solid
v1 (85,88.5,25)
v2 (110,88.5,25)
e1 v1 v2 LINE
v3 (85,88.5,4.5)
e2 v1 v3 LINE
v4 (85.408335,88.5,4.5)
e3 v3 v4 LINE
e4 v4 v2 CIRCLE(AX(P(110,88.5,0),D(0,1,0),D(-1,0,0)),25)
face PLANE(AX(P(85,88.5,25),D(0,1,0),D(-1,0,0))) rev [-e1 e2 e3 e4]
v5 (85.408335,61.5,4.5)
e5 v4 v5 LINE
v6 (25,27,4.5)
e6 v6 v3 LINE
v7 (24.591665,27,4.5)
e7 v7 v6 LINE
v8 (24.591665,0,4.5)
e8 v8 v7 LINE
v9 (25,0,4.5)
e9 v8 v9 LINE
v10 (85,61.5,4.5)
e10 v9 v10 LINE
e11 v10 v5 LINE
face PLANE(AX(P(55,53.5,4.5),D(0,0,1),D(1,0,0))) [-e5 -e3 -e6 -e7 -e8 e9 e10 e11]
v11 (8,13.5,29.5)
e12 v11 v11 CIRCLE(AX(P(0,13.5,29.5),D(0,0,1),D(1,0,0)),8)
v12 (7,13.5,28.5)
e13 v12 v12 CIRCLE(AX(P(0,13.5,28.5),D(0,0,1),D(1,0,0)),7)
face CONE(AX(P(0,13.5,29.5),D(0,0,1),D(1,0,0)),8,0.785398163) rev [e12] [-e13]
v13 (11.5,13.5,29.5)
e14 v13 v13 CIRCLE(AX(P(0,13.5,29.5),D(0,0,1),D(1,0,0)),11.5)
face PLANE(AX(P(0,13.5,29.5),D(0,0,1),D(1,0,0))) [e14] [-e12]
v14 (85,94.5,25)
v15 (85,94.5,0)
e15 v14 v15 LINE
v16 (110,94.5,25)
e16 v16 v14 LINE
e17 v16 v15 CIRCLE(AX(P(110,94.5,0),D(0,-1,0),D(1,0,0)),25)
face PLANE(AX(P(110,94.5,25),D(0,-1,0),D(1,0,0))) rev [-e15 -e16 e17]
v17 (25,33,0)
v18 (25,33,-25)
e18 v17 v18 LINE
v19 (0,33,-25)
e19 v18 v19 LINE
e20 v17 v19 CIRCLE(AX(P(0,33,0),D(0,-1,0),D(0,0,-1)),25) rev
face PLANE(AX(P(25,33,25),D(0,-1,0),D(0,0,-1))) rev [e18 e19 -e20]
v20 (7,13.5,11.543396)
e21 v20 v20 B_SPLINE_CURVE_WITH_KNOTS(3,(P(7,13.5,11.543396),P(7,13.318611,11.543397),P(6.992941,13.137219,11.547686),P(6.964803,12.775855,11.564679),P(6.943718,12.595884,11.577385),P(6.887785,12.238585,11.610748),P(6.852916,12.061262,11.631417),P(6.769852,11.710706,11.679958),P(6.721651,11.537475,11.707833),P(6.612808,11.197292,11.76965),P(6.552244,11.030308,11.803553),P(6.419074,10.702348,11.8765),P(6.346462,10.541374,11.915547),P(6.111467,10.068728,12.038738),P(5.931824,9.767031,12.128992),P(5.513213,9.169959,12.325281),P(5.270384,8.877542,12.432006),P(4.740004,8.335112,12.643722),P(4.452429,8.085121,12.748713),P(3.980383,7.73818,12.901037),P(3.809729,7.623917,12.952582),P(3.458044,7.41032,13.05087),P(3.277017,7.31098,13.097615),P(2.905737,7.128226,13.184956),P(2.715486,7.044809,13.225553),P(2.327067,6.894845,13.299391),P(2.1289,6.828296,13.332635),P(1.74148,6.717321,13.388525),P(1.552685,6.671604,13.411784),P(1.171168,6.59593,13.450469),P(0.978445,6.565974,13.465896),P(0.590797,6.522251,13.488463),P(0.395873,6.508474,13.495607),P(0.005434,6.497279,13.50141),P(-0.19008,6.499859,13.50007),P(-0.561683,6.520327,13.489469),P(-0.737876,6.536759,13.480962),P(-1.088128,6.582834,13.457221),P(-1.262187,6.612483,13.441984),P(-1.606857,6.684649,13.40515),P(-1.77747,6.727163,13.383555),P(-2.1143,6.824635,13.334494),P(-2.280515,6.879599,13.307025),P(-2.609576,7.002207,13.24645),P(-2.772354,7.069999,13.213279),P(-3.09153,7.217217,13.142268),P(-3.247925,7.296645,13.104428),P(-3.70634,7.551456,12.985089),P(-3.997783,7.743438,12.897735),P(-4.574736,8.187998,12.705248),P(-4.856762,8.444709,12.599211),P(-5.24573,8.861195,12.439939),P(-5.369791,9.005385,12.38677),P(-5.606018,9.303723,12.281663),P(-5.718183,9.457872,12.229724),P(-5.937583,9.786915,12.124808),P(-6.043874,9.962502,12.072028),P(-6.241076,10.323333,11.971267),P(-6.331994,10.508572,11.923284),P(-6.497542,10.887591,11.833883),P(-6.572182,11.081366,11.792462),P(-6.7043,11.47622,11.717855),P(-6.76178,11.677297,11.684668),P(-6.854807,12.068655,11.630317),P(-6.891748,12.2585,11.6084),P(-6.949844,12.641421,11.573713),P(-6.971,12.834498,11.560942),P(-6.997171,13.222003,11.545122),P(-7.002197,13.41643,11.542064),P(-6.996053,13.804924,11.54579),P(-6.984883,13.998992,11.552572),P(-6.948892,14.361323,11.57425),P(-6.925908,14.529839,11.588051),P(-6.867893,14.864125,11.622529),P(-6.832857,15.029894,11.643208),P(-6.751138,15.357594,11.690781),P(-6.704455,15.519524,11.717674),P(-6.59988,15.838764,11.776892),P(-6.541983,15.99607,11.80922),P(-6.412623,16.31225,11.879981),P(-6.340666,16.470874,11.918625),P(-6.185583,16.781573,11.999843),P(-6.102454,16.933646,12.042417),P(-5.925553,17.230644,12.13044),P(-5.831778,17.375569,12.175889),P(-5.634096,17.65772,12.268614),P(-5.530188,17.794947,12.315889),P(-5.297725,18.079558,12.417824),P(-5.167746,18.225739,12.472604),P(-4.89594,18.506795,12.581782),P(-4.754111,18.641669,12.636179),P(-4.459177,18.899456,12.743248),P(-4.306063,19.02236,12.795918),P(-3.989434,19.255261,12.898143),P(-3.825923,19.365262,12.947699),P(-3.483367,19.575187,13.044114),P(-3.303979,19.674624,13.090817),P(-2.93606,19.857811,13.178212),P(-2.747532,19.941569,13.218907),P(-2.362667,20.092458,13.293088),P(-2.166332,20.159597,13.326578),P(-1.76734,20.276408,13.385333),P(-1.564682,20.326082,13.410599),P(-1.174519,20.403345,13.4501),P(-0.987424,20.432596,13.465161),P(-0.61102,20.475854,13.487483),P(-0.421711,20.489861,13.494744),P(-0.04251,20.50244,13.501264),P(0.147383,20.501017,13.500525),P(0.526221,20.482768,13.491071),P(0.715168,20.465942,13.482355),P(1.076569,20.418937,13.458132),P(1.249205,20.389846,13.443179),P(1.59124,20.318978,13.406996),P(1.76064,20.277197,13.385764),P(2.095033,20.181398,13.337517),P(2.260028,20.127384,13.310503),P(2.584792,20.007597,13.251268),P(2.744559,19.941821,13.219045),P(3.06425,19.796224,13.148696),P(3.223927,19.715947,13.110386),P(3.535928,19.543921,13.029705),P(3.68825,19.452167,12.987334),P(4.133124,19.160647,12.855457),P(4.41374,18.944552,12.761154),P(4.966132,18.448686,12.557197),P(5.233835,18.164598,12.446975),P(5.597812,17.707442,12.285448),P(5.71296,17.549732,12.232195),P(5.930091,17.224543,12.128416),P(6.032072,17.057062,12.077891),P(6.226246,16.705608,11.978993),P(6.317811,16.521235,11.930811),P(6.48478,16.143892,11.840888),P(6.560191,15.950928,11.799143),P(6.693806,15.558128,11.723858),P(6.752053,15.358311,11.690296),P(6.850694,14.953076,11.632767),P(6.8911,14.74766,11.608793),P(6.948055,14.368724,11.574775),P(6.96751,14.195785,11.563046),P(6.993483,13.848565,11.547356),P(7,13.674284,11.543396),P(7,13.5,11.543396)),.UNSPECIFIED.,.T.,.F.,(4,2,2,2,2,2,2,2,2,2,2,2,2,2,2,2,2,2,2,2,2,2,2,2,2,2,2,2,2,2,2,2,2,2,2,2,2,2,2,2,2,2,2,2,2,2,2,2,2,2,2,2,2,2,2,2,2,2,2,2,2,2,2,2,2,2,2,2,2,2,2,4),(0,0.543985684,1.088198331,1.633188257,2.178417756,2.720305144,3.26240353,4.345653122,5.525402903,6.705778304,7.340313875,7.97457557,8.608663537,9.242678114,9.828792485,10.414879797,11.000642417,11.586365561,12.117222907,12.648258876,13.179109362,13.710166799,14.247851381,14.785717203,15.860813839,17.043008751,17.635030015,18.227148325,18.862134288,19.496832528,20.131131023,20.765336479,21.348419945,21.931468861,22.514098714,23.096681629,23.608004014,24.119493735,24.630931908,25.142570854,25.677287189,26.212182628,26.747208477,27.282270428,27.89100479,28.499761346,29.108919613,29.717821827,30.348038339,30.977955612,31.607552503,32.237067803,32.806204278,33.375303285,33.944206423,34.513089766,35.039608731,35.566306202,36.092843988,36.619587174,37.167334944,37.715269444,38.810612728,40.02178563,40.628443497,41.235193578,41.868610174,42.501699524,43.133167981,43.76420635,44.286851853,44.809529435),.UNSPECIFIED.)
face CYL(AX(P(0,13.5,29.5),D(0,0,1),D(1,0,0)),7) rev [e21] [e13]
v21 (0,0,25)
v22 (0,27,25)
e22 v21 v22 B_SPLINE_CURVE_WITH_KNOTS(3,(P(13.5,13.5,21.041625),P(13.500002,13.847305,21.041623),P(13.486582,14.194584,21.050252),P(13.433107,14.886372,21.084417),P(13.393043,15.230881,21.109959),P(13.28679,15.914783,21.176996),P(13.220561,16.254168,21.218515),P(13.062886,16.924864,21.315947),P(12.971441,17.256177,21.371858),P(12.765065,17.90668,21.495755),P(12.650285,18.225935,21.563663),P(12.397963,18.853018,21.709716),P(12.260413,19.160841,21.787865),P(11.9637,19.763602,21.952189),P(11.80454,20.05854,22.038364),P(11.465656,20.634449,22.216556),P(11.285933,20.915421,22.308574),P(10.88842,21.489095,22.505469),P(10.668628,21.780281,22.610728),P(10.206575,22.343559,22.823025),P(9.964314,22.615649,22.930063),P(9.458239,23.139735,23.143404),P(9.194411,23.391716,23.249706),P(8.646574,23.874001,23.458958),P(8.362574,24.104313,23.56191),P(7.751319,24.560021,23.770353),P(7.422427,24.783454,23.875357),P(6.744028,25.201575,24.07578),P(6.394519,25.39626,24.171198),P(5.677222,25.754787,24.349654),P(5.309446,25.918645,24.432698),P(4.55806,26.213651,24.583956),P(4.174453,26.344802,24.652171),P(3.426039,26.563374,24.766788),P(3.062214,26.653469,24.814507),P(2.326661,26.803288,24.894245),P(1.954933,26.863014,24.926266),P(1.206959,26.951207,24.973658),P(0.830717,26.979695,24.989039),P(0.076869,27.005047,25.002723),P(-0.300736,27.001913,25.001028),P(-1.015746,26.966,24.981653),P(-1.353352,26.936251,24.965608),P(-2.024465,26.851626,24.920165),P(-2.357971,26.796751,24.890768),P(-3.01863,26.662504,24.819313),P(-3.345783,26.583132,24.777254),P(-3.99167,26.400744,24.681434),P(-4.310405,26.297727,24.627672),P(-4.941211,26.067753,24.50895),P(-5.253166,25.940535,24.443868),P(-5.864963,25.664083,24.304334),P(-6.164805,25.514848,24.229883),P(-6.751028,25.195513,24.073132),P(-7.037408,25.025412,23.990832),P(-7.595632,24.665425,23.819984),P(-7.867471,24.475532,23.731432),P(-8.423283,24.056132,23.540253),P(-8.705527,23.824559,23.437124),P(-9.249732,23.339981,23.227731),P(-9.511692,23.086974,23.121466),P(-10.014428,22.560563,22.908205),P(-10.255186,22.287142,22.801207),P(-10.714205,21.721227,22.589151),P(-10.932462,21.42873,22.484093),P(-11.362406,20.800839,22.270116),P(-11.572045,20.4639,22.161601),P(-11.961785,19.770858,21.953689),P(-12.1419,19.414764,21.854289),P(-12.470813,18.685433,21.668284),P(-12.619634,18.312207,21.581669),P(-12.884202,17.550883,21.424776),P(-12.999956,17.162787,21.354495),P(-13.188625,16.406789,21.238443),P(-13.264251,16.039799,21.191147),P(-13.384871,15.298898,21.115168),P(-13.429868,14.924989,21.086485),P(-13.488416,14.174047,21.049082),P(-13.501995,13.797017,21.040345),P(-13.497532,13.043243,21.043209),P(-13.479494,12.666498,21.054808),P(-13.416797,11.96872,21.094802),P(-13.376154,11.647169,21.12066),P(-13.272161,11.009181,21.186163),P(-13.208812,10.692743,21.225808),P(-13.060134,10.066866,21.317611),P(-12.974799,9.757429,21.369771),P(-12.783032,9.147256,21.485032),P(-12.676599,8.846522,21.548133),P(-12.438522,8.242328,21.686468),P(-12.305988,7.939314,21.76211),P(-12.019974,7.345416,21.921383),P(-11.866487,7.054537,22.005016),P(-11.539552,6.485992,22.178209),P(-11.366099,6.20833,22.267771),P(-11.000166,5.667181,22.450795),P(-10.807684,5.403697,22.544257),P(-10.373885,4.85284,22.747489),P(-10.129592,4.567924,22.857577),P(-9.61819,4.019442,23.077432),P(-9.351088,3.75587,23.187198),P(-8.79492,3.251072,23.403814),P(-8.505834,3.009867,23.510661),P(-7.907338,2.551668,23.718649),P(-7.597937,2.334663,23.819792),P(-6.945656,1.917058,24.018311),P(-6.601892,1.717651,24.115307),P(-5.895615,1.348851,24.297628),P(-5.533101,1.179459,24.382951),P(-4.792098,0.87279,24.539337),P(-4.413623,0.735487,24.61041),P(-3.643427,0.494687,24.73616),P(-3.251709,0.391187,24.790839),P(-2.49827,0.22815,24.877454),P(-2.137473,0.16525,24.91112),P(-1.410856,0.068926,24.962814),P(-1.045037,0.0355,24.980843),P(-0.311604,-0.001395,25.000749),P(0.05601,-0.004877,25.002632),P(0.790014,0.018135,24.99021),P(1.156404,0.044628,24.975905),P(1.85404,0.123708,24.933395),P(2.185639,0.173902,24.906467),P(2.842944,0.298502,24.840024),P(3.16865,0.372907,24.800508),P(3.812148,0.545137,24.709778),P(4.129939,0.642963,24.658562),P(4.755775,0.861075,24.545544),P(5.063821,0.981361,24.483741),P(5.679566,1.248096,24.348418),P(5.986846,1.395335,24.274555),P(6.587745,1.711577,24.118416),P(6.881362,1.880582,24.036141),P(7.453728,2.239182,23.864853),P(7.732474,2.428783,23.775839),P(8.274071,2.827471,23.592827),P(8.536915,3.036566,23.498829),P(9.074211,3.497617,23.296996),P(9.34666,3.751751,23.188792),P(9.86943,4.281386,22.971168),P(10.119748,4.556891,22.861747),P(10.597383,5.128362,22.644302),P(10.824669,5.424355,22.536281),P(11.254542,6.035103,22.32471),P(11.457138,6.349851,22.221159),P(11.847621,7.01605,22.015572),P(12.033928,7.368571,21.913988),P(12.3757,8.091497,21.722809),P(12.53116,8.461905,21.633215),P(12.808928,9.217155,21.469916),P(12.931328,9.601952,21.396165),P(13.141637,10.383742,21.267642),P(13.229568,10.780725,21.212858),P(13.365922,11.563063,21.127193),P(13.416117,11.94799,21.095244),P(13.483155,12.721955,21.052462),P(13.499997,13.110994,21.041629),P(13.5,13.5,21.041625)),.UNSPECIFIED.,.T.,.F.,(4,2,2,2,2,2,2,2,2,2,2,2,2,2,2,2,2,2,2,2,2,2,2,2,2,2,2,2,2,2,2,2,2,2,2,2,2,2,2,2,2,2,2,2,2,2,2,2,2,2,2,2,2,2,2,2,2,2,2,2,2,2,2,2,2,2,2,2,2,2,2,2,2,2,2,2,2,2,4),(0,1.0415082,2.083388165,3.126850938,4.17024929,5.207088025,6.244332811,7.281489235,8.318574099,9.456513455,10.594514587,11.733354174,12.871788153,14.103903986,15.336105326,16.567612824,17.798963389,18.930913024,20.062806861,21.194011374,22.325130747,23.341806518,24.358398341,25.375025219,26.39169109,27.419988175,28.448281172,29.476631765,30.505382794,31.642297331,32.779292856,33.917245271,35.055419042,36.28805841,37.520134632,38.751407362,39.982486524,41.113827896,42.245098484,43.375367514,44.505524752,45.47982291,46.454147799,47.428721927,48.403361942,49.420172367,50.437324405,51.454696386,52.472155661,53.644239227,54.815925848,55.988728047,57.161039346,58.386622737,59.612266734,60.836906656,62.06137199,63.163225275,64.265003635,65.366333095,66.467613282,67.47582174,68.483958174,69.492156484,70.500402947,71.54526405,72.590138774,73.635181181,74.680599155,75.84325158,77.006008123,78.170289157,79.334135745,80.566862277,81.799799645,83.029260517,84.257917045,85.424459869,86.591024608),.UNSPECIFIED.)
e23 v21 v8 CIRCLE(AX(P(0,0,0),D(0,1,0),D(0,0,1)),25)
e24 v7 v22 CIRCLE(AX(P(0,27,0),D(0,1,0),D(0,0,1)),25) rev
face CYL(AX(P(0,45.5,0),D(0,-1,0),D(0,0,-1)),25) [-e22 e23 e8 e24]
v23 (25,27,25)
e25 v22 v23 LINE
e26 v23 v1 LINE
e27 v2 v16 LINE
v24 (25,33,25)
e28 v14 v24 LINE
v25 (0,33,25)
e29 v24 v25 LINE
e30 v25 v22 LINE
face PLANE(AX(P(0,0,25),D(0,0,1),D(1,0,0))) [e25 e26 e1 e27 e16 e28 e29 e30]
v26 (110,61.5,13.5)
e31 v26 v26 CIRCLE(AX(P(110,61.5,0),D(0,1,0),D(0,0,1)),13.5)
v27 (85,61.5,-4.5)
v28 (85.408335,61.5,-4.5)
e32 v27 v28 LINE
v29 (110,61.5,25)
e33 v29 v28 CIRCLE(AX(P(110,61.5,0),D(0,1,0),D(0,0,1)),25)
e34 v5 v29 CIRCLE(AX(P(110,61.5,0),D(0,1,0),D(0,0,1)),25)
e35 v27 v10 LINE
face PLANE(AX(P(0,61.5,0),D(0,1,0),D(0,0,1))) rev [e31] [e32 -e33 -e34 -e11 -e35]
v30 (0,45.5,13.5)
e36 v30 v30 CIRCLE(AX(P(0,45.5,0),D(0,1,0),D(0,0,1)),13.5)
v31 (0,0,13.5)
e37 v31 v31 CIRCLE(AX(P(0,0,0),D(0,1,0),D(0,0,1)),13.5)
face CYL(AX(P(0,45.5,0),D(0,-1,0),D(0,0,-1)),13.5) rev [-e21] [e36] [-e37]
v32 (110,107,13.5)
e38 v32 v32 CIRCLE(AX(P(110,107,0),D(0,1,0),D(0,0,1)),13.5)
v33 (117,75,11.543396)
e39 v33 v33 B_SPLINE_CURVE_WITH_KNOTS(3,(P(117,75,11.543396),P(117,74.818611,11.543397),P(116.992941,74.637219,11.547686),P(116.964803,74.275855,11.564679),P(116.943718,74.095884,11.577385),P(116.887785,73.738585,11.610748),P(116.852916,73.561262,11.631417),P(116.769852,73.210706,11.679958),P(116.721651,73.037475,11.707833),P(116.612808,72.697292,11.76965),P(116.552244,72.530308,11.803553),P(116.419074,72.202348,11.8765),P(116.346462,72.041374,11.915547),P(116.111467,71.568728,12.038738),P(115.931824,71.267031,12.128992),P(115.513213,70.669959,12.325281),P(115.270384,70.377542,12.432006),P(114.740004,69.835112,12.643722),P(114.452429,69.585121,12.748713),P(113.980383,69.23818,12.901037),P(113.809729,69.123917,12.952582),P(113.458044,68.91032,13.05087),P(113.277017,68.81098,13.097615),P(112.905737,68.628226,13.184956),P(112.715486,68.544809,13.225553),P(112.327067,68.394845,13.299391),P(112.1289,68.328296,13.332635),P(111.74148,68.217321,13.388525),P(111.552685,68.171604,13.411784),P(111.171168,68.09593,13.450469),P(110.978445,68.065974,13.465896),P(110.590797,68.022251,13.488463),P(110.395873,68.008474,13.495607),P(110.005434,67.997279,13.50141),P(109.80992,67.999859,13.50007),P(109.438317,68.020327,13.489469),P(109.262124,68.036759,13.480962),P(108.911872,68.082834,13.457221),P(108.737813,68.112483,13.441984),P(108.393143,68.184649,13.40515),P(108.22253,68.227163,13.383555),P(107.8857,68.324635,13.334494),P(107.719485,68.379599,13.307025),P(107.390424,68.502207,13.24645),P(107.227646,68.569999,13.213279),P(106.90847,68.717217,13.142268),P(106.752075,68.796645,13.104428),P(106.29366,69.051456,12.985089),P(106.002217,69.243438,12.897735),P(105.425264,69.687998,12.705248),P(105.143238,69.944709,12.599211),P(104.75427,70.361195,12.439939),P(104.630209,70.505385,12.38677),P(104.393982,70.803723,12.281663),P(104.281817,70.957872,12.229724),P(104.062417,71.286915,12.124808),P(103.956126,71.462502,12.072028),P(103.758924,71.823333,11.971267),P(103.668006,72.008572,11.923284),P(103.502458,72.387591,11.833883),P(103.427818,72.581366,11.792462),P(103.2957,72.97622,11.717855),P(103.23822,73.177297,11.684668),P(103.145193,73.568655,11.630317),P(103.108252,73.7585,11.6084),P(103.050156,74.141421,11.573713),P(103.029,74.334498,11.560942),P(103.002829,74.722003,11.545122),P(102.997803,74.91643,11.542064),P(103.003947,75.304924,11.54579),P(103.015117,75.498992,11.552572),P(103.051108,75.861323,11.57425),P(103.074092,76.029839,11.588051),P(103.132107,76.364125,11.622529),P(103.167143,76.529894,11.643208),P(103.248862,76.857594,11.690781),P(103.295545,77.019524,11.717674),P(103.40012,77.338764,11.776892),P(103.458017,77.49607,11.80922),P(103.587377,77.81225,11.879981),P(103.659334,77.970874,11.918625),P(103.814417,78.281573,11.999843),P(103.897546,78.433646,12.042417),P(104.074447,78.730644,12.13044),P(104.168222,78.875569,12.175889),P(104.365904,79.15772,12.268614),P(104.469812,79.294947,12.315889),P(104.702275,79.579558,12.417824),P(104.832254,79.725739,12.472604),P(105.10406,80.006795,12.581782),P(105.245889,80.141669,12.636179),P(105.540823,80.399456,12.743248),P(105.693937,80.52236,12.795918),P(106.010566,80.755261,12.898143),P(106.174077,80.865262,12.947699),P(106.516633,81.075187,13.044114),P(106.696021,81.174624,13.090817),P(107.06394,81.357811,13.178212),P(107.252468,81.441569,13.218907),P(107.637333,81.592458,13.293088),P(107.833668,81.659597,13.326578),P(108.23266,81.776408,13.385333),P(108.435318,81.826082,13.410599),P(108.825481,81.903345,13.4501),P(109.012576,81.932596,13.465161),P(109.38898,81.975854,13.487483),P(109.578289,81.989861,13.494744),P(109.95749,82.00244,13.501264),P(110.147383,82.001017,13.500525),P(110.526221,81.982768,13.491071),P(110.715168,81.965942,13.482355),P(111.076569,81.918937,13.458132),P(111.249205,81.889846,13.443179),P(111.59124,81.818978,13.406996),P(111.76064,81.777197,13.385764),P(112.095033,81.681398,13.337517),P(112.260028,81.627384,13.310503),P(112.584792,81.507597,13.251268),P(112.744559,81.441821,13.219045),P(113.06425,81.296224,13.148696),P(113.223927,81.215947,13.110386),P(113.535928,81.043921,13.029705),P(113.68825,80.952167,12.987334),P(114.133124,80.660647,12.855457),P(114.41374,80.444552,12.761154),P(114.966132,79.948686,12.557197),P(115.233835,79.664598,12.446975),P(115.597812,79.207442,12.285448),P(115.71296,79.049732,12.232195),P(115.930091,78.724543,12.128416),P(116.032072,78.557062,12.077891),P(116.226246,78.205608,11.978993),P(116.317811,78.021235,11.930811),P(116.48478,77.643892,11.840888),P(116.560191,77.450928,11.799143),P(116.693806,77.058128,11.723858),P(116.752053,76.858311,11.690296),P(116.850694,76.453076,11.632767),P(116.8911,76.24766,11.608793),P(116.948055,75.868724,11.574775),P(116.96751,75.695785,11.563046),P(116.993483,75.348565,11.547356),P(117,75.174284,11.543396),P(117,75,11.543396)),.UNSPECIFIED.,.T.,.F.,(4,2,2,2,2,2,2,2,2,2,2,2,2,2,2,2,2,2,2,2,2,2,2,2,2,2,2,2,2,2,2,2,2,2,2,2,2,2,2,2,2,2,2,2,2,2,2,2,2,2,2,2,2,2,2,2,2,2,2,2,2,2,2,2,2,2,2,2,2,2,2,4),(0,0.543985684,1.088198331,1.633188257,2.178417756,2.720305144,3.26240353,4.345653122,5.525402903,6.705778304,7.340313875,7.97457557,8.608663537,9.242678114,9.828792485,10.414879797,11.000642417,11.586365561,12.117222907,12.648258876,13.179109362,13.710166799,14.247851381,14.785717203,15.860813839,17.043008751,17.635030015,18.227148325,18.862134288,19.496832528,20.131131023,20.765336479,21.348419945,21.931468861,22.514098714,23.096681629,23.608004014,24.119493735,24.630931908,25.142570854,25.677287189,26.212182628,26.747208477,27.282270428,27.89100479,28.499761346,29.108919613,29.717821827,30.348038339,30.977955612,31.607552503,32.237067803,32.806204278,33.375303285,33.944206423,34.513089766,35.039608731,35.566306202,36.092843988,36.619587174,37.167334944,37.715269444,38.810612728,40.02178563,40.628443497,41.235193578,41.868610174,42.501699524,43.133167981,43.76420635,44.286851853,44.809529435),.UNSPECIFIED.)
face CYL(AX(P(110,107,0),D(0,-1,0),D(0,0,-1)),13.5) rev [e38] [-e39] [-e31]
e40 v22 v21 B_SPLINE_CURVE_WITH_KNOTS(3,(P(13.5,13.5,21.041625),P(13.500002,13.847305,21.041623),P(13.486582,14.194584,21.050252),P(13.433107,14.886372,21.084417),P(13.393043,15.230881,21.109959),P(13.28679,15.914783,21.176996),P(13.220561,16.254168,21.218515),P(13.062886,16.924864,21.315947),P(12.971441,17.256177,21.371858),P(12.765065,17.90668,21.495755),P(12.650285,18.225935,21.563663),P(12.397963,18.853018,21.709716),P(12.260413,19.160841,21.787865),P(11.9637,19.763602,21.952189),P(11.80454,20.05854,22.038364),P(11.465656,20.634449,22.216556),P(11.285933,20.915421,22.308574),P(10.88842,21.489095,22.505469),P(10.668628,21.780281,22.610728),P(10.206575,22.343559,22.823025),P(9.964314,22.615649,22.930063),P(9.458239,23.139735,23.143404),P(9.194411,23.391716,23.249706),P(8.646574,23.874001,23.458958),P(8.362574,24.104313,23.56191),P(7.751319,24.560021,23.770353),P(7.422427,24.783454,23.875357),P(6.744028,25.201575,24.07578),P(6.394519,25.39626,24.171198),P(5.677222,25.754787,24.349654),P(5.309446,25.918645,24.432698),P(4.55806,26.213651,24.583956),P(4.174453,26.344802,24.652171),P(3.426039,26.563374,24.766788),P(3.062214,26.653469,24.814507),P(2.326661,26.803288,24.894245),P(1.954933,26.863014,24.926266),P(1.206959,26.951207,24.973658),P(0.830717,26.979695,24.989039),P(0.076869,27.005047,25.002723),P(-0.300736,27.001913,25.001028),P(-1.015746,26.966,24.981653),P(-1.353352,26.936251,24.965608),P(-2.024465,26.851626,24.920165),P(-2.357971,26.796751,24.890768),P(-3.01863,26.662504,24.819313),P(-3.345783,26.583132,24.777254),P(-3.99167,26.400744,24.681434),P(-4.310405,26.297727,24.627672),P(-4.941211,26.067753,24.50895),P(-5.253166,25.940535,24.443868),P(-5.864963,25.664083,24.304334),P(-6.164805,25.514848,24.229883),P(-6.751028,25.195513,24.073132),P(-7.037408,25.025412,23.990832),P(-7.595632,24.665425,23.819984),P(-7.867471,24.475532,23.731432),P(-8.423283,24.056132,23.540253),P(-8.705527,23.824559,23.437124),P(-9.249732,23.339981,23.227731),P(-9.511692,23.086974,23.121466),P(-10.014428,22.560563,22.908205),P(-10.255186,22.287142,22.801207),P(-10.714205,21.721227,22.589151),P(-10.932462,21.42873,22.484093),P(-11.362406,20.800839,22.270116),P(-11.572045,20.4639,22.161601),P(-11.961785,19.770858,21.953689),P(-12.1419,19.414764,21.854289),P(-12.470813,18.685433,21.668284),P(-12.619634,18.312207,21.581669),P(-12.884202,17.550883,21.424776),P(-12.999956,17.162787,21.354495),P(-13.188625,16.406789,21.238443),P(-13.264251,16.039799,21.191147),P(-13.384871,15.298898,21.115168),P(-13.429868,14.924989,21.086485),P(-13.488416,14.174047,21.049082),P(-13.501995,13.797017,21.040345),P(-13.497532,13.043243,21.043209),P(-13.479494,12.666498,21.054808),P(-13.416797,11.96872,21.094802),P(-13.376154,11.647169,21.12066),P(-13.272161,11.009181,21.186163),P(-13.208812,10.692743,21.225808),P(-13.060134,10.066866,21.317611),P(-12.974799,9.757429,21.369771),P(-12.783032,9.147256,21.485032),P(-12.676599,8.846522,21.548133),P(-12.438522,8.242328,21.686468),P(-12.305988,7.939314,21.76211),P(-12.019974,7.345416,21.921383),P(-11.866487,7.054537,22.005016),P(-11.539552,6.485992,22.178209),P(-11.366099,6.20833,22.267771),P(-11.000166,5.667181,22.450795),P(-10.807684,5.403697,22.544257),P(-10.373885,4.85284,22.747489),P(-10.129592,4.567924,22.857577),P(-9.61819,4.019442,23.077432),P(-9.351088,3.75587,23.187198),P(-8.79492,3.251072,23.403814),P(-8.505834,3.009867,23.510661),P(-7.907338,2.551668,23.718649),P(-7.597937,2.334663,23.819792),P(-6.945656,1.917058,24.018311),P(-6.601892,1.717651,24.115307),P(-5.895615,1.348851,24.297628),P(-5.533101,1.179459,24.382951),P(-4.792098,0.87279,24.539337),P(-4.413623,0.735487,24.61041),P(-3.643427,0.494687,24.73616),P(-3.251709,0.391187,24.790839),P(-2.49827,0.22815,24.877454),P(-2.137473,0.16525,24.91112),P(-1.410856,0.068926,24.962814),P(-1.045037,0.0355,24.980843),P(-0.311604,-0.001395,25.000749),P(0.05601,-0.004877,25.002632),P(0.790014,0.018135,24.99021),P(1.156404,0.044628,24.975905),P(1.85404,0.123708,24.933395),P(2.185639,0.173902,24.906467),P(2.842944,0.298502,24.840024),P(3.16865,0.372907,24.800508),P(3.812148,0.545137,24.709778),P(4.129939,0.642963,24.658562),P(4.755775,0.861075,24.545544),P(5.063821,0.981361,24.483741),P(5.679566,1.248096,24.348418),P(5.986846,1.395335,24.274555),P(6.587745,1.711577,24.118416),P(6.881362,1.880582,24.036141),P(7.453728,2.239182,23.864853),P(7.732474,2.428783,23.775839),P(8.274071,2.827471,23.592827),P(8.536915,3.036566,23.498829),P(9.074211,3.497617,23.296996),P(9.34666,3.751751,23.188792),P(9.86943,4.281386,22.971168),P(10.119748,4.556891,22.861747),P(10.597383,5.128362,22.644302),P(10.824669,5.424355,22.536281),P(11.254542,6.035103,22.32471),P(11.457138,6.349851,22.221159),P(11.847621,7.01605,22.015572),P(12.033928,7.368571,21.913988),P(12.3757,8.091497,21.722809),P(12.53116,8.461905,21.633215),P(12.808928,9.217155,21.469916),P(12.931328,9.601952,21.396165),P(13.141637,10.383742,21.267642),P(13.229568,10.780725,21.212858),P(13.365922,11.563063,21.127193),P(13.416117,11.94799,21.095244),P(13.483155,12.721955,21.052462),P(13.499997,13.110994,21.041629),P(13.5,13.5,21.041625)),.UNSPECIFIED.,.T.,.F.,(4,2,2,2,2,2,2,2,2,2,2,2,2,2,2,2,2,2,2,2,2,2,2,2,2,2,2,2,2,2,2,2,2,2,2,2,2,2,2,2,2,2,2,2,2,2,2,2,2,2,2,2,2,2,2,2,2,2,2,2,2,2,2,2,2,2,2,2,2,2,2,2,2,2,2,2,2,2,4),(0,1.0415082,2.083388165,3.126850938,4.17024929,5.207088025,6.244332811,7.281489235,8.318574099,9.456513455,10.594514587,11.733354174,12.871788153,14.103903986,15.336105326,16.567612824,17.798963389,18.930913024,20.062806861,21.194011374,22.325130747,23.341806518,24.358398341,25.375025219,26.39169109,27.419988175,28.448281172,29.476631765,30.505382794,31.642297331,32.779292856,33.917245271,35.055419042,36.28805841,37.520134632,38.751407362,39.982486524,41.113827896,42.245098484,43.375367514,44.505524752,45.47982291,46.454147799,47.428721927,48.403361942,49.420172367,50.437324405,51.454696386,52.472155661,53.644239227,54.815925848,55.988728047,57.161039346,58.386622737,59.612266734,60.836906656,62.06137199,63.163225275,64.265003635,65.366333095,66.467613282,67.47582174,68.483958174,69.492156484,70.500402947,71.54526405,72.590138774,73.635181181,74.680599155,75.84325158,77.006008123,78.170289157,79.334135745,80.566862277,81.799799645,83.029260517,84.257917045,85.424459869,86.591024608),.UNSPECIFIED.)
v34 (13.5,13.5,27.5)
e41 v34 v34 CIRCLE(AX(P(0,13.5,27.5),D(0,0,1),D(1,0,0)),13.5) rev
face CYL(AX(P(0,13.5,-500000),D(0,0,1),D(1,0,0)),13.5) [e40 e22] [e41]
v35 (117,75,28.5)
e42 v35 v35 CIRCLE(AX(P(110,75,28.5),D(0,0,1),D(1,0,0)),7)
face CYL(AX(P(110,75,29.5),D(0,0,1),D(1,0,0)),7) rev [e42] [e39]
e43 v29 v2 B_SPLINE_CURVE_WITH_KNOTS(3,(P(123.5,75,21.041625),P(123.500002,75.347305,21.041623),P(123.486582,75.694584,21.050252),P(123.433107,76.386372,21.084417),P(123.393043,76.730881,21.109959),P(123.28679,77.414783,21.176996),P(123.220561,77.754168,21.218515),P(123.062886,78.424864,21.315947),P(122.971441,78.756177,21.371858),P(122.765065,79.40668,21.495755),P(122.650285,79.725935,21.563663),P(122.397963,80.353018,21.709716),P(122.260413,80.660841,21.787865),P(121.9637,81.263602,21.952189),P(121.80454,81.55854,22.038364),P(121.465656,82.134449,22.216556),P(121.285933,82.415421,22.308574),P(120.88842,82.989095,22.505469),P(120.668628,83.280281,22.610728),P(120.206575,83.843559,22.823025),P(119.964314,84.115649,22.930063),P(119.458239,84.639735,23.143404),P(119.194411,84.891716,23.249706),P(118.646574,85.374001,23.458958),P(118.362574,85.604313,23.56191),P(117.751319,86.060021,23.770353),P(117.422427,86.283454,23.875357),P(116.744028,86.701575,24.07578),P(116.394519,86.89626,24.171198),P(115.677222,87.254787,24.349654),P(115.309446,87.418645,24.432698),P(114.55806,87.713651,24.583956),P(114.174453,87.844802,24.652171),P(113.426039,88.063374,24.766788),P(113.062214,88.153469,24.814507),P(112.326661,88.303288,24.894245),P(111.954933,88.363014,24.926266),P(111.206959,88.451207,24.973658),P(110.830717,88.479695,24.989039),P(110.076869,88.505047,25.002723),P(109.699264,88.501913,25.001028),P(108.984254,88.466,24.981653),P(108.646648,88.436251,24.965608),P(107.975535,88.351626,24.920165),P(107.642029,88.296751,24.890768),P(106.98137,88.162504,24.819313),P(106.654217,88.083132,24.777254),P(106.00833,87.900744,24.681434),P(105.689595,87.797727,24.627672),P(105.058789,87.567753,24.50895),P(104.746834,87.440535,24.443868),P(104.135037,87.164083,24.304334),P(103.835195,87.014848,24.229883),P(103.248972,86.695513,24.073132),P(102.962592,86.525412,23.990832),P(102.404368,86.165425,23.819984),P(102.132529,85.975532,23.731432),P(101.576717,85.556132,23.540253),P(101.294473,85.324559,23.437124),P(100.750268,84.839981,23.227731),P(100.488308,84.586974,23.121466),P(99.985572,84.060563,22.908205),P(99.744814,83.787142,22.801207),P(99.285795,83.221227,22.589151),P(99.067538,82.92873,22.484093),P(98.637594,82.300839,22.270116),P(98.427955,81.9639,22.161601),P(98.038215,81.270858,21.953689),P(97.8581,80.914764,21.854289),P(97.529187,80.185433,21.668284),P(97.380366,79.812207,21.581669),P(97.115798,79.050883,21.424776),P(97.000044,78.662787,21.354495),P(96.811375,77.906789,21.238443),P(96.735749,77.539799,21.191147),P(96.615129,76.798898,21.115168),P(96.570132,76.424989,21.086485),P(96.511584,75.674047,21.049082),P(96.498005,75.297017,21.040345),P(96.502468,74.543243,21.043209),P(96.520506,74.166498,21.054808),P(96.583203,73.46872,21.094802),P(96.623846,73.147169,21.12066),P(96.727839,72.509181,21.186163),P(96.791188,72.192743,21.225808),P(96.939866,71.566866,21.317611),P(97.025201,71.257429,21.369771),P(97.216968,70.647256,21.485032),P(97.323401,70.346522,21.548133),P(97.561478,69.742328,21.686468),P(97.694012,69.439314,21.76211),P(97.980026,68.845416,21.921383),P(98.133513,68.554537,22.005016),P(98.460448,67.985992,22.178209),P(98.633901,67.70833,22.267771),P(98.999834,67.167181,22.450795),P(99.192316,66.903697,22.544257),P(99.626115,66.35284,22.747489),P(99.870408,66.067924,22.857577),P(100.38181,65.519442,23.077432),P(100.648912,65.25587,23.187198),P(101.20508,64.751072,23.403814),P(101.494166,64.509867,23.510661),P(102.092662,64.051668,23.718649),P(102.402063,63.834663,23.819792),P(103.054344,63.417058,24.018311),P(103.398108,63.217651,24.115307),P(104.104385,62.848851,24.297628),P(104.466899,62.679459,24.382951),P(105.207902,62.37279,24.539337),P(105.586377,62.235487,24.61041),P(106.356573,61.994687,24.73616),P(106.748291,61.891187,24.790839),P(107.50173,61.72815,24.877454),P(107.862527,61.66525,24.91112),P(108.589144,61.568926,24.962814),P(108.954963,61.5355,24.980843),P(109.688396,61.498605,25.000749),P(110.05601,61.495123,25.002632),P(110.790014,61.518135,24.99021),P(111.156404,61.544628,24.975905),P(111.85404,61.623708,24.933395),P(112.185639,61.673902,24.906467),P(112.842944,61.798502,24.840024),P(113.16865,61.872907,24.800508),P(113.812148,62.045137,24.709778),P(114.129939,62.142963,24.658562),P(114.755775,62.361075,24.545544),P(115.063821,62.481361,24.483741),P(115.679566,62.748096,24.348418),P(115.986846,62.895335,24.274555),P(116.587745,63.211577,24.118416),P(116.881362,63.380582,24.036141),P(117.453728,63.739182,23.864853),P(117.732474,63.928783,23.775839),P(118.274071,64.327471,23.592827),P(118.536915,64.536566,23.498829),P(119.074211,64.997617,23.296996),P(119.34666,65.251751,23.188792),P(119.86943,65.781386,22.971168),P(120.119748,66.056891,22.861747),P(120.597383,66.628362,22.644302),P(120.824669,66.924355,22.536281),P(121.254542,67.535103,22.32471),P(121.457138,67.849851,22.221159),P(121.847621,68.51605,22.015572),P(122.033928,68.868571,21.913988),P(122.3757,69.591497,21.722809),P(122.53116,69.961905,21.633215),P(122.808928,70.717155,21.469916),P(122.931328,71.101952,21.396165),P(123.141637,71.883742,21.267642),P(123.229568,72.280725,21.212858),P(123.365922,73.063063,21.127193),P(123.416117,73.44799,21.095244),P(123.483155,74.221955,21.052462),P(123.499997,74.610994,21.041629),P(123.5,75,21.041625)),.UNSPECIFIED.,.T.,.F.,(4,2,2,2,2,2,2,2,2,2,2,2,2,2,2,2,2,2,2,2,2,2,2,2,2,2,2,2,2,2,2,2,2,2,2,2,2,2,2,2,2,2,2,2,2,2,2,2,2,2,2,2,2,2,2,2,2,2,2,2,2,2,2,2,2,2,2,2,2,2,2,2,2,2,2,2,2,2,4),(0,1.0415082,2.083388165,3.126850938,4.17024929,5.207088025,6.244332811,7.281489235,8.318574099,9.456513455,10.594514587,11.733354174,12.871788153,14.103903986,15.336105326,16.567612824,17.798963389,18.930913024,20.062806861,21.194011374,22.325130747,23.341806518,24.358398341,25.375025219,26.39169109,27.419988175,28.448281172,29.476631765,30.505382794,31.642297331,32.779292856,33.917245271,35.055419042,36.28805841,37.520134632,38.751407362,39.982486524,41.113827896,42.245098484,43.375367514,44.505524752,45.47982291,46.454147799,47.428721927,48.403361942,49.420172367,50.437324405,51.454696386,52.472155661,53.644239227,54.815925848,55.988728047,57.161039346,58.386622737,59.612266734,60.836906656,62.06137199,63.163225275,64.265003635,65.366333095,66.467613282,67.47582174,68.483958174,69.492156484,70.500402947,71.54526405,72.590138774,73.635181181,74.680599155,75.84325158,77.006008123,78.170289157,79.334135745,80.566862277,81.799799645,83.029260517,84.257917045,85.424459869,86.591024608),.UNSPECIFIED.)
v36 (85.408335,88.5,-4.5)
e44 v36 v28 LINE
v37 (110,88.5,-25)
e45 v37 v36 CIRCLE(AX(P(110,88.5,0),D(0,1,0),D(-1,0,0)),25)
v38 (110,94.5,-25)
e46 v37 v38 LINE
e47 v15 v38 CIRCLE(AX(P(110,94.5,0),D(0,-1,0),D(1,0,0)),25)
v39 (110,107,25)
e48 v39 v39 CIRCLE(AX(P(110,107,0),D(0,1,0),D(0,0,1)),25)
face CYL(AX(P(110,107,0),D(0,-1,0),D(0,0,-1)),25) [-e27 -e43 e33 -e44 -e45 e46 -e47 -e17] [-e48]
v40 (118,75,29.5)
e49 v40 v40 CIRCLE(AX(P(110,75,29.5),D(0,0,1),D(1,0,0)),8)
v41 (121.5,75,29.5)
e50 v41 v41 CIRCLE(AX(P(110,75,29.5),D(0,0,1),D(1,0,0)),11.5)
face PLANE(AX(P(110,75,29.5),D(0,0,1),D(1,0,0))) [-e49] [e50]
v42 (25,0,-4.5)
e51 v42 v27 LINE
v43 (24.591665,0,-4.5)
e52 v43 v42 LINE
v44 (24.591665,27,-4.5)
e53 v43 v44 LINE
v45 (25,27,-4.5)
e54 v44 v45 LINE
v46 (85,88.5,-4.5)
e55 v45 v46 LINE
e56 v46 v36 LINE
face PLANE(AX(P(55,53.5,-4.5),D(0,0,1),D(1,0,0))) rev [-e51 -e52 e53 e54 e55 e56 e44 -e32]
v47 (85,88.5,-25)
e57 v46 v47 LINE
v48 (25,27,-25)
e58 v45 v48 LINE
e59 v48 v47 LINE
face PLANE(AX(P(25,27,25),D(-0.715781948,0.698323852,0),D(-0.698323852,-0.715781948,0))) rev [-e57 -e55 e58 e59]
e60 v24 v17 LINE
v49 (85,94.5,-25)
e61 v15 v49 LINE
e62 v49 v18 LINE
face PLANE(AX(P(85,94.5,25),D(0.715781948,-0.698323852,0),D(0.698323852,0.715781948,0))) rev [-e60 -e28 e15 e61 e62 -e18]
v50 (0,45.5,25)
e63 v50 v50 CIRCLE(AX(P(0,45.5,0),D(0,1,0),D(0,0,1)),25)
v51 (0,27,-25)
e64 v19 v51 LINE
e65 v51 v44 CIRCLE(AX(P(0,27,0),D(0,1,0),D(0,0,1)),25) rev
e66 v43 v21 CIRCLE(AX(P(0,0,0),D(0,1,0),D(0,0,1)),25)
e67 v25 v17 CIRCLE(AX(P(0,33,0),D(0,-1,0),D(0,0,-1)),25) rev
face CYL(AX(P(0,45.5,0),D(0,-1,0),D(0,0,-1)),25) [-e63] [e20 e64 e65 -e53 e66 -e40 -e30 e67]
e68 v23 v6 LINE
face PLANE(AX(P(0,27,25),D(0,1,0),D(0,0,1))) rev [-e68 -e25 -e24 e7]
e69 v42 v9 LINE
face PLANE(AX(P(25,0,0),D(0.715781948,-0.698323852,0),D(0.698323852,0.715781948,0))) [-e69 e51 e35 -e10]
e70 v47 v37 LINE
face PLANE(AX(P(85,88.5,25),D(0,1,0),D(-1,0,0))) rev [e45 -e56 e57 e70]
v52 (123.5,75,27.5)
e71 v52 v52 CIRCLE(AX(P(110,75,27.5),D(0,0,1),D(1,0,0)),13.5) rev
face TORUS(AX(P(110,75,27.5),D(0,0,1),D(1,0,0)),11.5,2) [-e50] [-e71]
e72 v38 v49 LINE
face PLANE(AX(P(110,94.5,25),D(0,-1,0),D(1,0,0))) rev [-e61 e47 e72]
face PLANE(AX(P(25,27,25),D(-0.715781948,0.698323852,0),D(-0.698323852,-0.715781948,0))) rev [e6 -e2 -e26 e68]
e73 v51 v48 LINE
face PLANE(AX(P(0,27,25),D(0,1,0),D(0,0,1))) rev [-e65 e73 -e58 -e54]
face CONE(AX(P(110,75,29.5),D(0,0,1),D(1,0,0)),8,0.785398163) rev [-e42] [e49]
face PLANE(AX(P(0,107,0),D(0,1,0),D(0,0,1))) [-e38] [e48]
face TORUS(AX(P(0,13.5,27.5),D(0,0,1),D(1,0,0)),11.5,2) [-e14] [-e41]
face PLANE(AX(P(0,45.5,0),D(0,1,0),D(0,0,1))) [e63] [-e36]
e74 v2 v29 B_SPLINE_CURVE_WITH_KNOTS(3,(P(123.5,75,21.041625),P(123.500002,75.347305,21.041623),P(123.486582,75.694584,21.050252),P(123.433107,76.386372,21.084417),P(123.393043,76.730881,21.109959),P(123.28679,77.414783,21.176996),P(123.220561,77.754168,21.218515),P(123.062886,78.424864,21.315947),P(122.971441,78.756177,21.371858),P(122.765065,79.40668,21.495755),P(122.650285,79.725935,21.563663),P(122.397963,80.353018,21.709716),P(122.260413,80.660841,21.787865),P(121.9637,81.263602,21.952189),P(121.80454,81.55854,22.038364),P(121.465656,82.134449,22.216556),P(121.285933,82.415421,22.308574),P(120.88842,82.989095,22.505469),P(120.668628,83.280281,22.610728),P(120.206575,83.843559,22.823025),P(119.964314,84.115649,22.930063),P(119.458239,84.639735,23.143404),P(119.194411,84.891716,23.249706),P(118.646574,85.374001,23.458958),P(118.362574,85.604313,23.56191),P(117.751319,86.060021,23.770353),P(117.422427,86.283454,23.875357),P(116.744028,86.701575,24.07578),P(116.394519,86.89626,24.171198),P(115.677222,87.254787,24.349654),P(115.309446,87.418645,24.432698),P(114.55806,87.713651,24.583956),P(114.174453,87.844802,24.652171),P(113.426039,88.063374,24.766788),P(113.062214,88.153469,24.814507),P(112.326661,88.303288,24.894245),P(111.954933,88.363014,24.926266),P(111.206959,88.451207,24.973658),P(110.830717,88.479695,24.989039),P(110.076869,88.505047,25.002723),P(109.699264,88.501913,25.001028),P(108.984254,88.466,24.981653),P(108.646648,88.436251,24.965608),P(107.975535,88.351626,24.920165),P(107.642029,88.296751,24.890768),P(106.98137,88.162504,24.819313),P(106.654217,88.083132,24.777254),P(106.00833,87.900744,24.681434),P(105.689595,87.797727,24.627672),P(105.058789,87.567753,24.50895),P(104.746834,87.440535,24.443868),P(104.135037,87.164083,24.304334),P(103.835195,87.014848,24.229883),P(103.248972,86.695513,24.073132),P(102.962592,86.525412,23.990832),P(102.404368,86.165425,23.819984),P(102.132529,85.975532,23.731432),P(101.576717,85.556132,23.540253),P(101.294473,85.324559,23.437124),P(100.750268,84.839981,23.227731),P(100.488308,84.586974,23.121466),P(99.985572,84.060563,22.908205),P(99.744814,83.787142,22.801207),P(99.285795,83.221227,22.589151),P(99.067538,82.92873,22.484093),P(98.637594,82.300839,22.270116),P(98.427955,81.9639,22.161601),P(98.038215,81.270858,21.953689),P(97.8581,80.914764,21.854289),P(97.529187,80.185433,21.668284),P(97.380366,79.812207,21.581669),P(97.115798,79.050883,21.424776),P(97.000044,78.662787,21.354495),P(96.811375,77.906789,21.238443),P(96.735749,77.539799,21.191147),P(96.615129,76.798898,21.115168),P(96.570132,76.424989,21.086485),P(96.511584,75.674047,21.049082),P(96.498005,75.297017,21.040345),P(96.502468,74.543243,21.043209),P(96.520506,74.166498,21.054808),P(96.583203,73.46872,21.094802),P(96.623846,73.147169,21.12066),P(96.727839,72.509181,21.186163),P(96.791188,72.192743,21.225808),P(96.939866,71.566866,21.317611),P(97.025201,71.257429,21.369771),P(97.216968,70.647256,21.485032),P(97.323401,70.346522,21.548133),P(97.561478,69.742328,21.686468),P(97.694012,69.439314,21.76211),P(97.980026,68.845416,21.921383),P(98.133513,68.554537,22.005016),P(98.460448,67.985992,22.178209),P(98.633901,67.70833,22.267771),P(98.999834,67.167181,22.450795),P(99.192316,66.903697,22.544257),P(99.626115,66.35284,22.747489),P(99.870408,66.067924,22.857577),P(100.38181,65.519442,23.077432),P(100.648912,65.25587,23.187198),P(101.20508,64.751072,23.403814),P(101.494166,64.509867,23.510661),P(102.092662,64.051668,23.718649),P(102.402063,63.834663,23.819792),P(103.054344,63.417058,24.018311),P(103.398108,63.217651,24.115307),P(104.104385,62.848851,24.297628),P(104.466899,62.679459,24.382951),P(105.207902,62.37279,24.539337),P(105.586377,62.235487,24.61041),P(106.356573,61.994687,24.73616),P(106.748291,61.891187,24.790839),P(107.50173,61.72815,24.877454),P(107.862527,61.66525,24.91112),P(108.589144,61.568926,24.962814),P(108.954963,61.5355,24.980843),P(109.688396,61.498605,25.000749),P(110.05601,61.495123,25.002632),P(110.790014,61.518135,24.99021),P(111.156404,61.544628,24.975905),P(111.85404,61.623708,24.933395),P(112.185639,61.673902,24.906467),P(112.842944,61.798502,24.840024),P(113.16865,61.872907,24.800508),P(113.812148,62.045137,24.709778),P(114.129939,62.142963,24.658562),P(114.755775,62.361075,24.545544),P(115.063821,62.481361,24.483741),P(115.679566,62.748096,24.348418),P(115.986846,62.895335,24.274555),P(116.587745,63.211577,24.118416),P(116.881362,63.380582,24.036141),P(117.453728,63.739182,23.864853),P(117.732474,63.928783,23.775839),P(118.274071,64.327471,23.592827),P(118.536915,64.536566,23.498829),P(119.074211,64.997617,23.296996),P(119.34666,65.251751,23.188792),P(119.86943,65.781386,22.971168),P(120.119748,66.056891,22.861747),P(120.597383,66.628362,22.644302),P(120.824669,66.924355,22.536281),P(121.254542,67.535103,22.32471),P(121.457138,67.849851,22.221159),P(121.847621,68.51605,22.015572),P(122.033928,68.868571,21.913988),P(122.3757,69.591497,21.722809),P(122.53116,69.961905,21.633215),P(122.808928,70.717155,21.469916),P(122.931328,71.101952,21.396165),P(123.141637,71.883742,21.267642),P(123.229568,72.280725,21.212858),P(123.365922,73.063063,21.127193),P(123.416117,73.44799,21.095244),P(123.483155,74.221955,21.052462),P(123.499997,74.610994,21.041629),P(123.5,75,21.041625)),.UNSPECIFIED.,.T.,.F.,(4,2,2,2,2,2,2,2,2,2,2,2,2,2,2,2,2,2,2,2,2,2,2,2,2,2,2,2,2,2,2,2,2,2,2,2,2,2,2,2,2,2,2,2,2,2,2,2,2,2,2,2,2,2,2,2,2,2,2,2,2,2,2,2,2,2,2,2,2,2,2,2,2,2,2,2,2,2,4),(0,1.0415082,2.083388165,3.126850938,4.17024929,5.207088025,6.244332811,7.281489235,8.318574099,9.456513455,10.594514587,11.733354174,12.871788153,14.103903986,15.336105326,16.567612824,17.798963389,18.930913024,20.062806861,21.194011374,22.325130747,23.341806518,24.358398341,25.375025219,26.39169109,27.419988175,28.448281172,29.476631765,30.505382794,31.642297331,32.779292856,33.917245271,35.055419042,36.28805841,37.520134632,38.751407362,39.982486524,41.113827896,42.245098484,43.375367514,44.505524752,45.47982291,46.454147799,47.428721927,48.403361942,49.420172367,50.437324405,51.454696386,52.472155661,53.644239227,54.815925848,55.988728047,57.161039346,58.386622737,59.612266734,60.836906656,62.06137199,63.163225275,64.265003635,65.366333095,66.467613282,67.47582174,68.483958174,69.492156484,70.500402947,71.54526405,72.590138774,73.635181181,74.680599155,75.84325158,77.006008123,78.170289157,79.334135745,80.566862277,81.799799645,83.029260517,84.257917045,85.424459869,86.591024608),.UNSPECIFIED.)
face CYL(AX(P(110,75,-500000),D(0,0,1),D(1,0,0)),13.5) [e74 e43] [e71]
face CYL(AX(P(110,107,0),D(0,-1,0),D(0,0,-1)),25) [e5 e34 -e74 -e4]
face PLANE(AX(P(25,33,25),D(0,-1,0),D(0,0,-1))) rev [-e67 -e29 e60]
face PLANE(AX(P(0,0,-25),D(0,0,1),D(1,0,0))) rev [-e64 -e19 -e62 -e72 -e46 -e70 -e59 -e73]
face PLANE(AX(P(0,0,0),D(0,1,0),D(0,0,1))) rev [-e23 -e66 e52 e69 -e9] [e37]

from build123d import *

# Parameters (mm, degrees)
BOSS_EXTRUDE1_START     = 61.5
SKETCH2_R               = 25
SKETCH2_R_2             = 13.5
BOSS_EXTRUDE1_DEPTH     = 45.5
SKETCH2_3_R             = 25
SKETCH2_3_R_2           = 13.5
BOSS_EXTRUDE2_DEPTH     = 45.5
BOSS_EXTRUDE3_DEPTH     = 25
BOSS_EXTRUDE5_REACH     = 205.566
BOSS_EXTRUDE5_START     = 29.5
SKETCH4_R               = 13.5
RIB1_START              = -4.5
RIB1_DEPTH              = 9
FILLET1_R               = 2
CUT_EXTRUDE3_DEPTH      = 175.769133569
CUT_EXTRUDE3_DEPTH_BACK = 52.5
SKETCH10_R              = 13.5


with BuildPart() as part:
    # Sketch2 → Boss-Extrude1 (new body)
    with BuildSketch(Plane(origin=(0, 0, 0), x_dir=(1, 0, 0), z_dir=(0, 1, 0)).offset(BOSS_EXTRUDE1_START)):
        with Locations(Location((110, 0, 0), (0, 0, 270))):
            Circle(SKETCH2_R)
        with Locations(Location((110, 0, 0), (0, 0, 270))):
            Circle(SKETCH2_R_2, mode=Mode.SUBTRACT)
    extrude(amount=BOSS_EXTRUDE1_DEPTH)



with BuildPart() as body_2:
    # Sketch2<3> → Boss-Extrude2 (new body)
    with BuildSketch(Plane(origin=(0, 0, 0), x_dir=(1, 0, 0), z_dir=(0, 1, 0))):
        with Locations(Location((0, 0, 0), (0, 0, 270))):
            Circle(SKETCH2_3_R)
        with Locations(Location((0, 0, 0), (0, 0, 270))):
            Circle(SKETCH2_3_R_2, mode=Mode.SUBTRACT)
    extrude(amount=BOSS_EXTRUDE2_DEPTH)


with BuildPart() as part_1:
    add(part.part)

    add(body_2.part)  # Boss-Extrude3 merges body 2
    # Sketch3 → Boss-Extrude3 (add, symmetric)
    with BuildSketch(Plane.XY):
        Polygon((0, 27), (25, 27), (85, 88.5), (110, 88.5), (110, 94.5), (85, 94.5), (25, 33), (0, 33), align=None)
    extrude(amount=BOSS_EXTRUDE3_DEPTH, both=True)

    # Sketch4 → Boss-Extrude5 (add, up to next)
    with BuildSketch(Plane.XY.offset(BOSS_EXTRUDE5_START), mode=Mode.PRIVATE) as boss_extrude5_sk1:
        with Locations((0, 13.5)):
            Circle(SKETCH4_R)
    boss_extrude5_tool1 = extrude(boss_extrude5_sk1.sketch, amount=-BOSS_EXTRUDE5_REACH, mode=Mode.PRIVATE) - part_1.part
    # Sketch4 → Boss-Extrude5 (add, up to next)
    with BuildSketch(Plane.XY.offset(BOSS_EXTRUDE5_START), mode=Mode.PRIVATE) as boss_extrude5_sk2:
        with Locations((110, 75)):
            Circle(SKETCH4_R)
    boss_extrude5_tool2 = extrude(boss_extrude5_sk2.sketch, amount=-BOSS_EXTRUDE5_REACH, mode=Mode.PRIVATE) - part_1.part
    add(boss_extrude5_tool1.solids().sort_by_distance((0, 13.5, 29.5))[0])
    add(boss_extrude5_tool2.solids().sort_by_distance((110, 75, 29.5))[0])

    # Rib1: read off the stored shape, not the designer's step
    # Rib1 outline → Rib1 (add)
    with BuildSketch(Plane.XY.offset(RIB1_START)):
        Polygon((85, 61.5), (85.408334745, 61.5), (85.408334745, 88.5), (85, 88.5), (25, 27), (24.591665255, 27), (24.591665255, 0), (25, 0), align=None)
    extrude(amount=RIB1_DEPTH)

    # CSK for M16 SFHCS1: read off the stored shape, not the designer's step
    # CSK for M16 SFHCS1 outline → CSK for M16 SFHCS1 (revolve, cut)
    with BuildSketch(Plane(origin=(110, 75, 0), x_dir=(1, 0, 0), z_dir=(0, -1, 0))):
        Polygon((0, 11.543091406), (7, 11.543091406), (7, 28.5), (8, 29.5), (0, 29.5), align=None)
    revolve(axis=Axis((110, 75, 0), (0, 0, 1)), mode=Mode.SUBTRACT)

    # CSK for M16 SFHCS1 2 outline → CSK for M16 SFHCS1 2 (revolve, cut)
    with BuildSketch(Plane.XZ.offset(-13.5)):
        Polygon((0, 11.543091406), (7, 11.543091406), (7, 28.5), (8, 29.5), (0, 29.5), align=None)
    revolve(axis=Axis((0, 13.5, 0), (0, 0, 1)), mode=Mode.SUBTRACT)

    # Fillet1
    fillet1_edges = [part_1.edges().sort_by_distance(p)[0] for p in [
        (-13.5, 13.5, 29.5),
        (96.5, 75, 29.5),
    ]]
    fillet(fillet1_edges, radius=FILLET1_R)

    # Sketch10 → Cut-Extrude3 (cut, two sides: drawn at the far end of the back side and taken through both)
    with BuildSketch(Plane(origin=(0, 0, 0), x_dir=(1, 0, 0), z_dir=(0, 1, 0)).offset(-CUT_EXTRUDE3_DEPTH_BACK)):
        with Locations(Location((0, 0, 0), (0, 0, 270))):
            Circle(SKETCH10_R)
        with Locations(Location((110, 0, 0), (0, 0, 270))):
            Circle(SKETCH10_R)
    extrude(amount=CUT_EXTRUDE3_DEPTH + CUT_EXTRUDE3_DEPTH_BACK, mode=Mode.SUBTRACT)


solid = part_1.part
